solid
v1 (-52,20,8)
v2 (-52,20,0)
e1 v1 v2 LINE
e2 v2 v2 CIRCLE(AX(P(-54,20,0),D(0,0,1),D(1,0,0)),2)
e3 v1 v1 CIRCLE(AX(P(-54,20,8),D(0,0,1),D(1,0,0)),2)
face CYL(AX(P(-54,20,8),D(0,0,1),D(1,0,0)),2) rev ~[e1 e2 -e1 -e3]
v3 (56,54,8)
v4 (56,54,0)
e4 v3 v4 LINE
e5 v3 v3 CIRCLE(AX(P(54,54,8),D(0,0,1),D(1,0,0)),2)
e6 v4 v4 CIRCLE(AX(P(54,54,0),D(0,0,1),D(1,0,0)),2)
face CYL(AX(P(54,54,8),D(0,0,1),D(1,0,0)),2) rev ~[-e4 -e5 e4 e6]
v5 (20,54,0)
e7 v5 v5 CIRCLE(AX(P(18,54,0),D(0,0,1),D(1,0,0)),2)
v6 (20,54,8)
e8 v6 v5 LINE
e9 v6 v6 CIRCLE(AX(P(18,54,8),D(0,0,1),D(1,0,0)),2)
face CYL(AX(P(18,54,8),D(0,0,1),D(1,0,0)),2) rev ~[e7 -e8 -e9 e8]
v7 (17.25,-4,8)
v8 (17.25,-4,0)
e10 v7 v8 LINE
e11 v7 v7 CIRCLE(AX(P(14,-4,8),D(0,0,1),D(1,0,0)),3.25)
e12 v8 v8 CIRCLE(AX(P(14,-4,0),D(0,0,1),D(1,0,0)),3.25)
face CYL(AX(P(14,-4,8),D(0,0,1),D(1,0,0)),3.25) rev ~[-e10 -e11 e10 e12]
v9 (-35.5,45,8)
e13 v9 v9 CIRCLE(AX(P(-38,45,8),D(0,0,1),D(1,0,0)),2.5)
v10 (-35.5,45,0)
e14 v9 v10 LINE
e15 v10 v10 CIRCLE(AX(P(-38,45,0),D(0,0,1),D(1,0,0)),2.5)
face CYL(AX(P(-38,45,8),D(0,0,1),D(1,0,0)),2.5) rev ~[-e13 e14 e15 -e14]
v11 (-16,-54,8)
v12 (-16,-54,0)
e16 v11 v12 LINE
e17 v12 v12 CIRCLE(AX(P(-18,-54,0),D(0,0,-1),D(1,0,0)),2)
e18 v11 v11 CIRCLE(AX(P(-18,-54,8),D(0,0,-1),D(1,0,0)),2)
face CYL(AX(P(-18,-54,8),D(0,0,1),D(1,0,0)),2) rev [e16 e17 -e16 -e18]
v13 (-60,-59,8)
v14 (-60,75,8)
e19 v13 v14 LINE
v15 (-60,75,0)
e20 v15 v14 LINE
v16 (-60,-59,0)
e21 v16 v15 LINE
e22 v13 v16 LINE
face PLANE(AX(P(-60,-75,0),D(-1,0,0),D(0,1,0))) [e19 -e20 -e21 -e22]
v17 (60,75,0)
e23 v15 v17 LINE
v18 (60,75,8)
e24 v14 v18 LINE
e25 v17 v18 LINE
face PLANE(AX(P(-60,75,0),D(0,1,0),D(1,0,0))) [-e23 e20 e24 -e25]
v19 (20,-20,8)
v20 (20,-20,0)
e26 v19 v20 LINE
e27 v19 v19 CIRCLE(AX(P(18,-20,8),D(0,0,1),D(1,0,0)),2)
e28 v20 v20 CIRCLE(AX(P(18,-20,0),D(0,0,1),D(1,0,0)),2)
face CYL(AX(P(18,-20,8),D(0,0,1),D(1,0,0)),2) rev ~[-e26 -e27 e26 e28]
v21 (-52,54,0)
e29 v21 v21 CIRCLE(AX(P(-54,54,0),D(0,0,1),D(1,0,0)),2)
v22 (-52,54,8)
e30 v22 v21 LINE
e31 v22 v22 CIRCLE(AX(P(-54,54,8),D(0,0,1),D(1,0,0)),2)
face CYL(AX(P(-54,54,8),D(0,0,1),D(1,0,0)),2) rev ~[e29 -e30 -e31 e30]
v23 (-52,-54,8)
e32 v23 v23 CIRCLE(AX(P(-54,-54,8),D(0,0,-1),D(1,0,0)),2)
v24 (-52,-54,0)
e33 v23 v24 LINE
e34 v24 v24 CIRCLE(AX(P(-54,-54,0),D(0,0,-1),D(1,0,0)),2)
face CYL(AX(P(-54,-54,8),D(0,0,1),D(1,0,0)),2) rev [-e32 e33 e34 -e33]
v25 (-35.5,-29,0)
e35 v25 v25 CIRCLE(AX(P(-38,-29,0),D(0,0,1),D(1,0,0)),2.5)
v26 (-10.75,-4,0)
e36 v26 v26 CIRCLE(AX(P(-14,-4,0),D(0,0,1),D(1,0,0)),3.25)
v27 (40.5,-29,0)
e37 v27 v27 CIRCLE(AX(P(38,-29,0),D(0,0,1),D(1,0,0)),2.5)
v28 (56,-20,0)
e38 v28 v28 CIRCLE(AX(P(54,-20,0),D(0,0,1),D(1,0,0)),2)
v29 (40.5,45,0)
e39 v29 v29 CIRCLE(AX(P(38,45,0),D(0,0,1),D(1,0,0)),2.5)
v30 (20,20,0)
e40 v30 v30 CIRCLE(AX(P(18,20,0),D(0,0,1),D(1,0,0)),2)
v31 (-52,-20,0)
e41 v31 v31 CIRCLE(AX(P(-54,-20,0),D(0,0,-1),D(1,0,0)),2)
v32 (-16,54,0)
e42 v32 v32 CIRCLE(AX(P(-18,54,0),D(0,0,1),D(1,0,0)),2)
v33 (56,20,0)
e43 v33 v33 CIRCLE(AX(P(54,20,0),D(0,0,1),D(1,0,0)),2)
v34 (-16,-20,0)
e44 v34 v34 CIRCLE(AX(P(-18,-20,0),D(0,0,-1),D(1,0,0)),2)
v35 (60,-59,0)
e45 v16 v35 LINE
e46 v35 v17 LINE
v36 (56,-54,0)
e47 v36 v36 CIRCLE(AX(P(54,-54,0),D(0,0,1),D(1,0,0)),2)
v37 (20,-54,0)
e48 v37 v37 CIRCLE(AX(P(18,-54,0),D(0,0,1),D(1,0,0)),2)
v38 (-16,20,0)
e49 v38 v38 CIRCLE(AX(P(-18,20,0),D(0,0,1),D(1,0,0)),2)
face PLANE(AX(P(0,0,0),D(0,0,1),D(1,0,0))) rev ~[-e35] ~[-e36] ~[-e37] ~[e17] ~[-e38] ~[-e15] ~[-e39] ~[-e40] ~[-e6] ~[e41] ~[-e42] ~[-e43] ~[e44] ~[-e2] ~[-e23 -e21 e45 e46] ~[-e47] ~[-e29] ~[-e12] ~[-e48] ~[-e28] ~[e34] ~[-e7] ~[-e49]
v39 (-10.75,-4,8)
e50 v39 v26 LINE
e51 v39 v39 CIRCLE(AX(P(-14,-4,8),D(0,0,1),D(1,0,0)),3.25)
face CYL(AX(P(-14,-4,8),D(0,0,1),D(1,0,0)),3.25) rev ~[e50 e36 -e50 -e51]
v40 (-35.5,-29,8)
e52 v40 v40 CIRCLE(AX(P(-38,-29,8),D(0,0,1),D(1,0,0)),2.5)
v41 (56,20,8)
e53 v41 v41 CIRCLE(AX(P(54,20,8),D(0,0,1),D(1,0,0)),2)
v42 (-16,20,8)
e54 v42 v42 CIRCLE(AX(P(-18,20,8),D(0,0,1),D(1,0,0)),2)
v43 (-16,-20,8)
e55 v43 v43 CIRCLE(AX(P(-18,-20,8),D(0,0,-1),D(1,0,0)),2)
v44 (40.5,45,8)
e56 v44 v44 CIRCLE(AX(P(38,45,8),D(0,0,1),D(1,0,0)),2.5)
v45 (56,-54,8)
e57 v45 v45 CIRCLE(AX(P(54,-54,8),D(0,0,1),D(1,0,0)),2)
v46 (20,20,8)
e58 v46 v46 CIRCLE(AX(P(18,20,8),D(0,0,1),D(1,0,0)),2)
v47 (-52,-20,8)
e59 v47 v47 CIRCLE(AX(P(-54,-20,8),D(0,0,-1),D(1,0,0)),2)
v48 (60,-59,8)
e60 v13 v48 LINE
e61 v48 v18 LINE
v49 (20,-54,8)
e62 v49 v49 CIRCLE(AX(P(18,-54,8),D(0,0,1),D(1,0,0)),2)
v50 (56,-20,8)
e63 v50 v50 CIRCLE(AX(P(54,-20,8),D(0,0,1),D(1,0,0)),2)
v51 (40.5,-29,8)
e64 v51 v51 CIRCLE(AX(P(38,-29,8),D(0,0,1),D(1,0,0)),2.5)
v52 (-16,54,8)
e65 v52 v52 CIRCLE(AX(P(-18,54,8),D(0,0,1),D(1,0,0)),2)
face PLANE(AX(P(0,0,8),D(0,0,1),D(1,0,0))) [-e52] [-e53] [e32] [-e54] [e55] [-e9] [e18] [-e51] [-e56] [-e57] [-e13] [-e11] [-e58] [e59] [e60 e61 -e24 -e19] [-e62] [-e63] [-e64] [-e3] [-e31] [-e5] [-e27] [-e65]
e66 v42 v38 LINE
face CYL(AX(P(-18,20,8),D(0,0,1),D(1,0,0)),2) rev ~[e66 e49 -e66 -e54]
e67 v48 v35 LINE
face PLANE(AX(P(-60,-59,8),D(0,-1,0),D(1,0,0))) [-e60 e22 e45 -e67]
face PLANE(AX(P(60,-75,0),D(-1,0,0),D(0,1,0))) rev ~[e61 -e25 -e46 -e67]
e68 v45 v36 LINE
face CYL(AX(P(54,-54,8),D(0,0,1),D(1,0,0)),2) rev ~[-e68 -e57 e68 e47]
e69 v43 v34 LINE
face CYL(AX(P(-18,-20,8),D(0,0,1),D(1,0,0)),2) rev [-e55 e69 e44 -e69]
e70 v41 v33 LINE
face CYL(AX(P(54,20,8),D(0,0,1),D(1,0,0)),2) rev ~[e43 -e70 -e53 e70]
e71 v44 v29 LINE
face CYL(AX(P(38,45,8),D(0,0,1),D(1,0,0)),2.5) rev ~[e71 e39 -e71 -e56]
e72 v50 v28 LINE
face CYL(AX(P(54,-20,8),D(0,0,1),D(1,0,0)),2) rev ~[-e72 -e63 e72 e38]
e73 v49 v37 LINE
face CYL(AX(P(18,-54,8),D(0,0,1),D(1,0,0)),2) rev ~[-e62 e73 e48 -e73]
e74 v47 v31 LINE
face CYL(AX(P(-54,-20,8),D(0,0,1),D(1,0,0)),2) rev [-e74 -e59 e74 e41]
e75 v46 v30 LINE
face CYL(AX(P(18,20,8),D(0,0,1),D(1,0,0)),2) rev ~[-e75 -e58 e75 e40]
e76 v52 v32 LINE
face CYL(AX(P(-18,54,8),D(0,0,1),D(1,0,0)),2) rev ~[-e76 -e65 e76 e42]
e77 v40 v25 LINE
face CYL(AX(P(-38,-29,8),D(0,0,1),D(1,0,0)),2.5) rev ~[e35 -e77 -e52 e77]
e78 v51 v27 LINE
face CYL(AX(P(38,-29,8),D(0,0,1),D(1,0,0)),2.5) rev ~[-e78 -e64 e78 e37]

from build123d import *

# Parameters (mm, degrees)
F0_W             = 120
F0_H             = 150
F1_DEPTH         = 8
F2_R             = 2
F3_DEPTH         = 8
F3_COPIES_COUNT  = 3
F3_COPIES_PITCH  = 36
F3_COPIES2_COUNT = 2
F3_COPIES2_PITCH = 103.247276
F4_R             = 3.25
F4_W             = 120
F4_H             = 16
F4_R_2           = 2.5
F5_DEPTH         = 8


# Not quite as in the source:
# - a pattern or mirror of a feature is missing from the dataset's text; its kind, count and spacing are read off the source's solid


with BuildPart() as f1:
    # F0 (on Top) → F1 (new body)
    with BuildSketch(Plane.XY):
        Rectangle(F0_W, F0_H)
    extrude(amount=F1_DEPTH)

    # F2 (on face) → F3 (cut, through all)
    with BuildSketch(Plane.XY.offset(8)):
        with Locations((-54, 54)):
            Circle(F2_R)
        with Locations((-18, 54)):
            Circle(F2_R)
        with Locations((-18, 20)):
            Circle(F2_R)
        with Locations((-54, 20)):
            Circle(F2_R)
    f3 = extrude(amount=-F3_DEPTH, mode=Mode.SUBTRACT)

    # F3_copies: F3 ×3
    with Locations(*[(i * F3_COPIES_PITCH, 0, 0) for i in range(1, F3_COPIES_COUNT)]):
        add(f3, mode=Mode.SUBTRACT)

    # F3_copies1: F3 across plane
    add(f3.mirror(Plane(origin=(0, 0, 0), x_dir=(0, 0, -1), z_dir=(0, -1, 0))), mode=Mode.SUBTRACT)

    # F3_copies2: F3 ×2
    with Locations(*[Vector(0.6973549598, -0.7167259309, 0) * (i * F3_COPIES2_PITCH) for i in range(1, F3_COPIES2_COUNT)]):
        add(f3, mode=Mode.SUBTRACT)

    # F4 (on face) → F5 (cut, through all)
    with BuildSketch(Plane.XY.offset(8)):
        with Locations((-14, -4)):
            Circle(F4_R)
        with Locations((14, -4)):
            Circle(F4_R)
        with Locations((0, -67)):
            Rectangle(F4_W, F4_H)
        with Locations((38, -29)):
            Circle(F4_R_2)
        with Locations((38, 45)):
            Circle(F4_R_2)
        with Locations((-38, 45)):
            Circle(F4_R_2)
        with Locations((-38, -29)):
            Circle(F4_R_2)
    extrude(amount=-F5_DEPTH, mode=Mode.SUBTRACT)


solid = f1.part
